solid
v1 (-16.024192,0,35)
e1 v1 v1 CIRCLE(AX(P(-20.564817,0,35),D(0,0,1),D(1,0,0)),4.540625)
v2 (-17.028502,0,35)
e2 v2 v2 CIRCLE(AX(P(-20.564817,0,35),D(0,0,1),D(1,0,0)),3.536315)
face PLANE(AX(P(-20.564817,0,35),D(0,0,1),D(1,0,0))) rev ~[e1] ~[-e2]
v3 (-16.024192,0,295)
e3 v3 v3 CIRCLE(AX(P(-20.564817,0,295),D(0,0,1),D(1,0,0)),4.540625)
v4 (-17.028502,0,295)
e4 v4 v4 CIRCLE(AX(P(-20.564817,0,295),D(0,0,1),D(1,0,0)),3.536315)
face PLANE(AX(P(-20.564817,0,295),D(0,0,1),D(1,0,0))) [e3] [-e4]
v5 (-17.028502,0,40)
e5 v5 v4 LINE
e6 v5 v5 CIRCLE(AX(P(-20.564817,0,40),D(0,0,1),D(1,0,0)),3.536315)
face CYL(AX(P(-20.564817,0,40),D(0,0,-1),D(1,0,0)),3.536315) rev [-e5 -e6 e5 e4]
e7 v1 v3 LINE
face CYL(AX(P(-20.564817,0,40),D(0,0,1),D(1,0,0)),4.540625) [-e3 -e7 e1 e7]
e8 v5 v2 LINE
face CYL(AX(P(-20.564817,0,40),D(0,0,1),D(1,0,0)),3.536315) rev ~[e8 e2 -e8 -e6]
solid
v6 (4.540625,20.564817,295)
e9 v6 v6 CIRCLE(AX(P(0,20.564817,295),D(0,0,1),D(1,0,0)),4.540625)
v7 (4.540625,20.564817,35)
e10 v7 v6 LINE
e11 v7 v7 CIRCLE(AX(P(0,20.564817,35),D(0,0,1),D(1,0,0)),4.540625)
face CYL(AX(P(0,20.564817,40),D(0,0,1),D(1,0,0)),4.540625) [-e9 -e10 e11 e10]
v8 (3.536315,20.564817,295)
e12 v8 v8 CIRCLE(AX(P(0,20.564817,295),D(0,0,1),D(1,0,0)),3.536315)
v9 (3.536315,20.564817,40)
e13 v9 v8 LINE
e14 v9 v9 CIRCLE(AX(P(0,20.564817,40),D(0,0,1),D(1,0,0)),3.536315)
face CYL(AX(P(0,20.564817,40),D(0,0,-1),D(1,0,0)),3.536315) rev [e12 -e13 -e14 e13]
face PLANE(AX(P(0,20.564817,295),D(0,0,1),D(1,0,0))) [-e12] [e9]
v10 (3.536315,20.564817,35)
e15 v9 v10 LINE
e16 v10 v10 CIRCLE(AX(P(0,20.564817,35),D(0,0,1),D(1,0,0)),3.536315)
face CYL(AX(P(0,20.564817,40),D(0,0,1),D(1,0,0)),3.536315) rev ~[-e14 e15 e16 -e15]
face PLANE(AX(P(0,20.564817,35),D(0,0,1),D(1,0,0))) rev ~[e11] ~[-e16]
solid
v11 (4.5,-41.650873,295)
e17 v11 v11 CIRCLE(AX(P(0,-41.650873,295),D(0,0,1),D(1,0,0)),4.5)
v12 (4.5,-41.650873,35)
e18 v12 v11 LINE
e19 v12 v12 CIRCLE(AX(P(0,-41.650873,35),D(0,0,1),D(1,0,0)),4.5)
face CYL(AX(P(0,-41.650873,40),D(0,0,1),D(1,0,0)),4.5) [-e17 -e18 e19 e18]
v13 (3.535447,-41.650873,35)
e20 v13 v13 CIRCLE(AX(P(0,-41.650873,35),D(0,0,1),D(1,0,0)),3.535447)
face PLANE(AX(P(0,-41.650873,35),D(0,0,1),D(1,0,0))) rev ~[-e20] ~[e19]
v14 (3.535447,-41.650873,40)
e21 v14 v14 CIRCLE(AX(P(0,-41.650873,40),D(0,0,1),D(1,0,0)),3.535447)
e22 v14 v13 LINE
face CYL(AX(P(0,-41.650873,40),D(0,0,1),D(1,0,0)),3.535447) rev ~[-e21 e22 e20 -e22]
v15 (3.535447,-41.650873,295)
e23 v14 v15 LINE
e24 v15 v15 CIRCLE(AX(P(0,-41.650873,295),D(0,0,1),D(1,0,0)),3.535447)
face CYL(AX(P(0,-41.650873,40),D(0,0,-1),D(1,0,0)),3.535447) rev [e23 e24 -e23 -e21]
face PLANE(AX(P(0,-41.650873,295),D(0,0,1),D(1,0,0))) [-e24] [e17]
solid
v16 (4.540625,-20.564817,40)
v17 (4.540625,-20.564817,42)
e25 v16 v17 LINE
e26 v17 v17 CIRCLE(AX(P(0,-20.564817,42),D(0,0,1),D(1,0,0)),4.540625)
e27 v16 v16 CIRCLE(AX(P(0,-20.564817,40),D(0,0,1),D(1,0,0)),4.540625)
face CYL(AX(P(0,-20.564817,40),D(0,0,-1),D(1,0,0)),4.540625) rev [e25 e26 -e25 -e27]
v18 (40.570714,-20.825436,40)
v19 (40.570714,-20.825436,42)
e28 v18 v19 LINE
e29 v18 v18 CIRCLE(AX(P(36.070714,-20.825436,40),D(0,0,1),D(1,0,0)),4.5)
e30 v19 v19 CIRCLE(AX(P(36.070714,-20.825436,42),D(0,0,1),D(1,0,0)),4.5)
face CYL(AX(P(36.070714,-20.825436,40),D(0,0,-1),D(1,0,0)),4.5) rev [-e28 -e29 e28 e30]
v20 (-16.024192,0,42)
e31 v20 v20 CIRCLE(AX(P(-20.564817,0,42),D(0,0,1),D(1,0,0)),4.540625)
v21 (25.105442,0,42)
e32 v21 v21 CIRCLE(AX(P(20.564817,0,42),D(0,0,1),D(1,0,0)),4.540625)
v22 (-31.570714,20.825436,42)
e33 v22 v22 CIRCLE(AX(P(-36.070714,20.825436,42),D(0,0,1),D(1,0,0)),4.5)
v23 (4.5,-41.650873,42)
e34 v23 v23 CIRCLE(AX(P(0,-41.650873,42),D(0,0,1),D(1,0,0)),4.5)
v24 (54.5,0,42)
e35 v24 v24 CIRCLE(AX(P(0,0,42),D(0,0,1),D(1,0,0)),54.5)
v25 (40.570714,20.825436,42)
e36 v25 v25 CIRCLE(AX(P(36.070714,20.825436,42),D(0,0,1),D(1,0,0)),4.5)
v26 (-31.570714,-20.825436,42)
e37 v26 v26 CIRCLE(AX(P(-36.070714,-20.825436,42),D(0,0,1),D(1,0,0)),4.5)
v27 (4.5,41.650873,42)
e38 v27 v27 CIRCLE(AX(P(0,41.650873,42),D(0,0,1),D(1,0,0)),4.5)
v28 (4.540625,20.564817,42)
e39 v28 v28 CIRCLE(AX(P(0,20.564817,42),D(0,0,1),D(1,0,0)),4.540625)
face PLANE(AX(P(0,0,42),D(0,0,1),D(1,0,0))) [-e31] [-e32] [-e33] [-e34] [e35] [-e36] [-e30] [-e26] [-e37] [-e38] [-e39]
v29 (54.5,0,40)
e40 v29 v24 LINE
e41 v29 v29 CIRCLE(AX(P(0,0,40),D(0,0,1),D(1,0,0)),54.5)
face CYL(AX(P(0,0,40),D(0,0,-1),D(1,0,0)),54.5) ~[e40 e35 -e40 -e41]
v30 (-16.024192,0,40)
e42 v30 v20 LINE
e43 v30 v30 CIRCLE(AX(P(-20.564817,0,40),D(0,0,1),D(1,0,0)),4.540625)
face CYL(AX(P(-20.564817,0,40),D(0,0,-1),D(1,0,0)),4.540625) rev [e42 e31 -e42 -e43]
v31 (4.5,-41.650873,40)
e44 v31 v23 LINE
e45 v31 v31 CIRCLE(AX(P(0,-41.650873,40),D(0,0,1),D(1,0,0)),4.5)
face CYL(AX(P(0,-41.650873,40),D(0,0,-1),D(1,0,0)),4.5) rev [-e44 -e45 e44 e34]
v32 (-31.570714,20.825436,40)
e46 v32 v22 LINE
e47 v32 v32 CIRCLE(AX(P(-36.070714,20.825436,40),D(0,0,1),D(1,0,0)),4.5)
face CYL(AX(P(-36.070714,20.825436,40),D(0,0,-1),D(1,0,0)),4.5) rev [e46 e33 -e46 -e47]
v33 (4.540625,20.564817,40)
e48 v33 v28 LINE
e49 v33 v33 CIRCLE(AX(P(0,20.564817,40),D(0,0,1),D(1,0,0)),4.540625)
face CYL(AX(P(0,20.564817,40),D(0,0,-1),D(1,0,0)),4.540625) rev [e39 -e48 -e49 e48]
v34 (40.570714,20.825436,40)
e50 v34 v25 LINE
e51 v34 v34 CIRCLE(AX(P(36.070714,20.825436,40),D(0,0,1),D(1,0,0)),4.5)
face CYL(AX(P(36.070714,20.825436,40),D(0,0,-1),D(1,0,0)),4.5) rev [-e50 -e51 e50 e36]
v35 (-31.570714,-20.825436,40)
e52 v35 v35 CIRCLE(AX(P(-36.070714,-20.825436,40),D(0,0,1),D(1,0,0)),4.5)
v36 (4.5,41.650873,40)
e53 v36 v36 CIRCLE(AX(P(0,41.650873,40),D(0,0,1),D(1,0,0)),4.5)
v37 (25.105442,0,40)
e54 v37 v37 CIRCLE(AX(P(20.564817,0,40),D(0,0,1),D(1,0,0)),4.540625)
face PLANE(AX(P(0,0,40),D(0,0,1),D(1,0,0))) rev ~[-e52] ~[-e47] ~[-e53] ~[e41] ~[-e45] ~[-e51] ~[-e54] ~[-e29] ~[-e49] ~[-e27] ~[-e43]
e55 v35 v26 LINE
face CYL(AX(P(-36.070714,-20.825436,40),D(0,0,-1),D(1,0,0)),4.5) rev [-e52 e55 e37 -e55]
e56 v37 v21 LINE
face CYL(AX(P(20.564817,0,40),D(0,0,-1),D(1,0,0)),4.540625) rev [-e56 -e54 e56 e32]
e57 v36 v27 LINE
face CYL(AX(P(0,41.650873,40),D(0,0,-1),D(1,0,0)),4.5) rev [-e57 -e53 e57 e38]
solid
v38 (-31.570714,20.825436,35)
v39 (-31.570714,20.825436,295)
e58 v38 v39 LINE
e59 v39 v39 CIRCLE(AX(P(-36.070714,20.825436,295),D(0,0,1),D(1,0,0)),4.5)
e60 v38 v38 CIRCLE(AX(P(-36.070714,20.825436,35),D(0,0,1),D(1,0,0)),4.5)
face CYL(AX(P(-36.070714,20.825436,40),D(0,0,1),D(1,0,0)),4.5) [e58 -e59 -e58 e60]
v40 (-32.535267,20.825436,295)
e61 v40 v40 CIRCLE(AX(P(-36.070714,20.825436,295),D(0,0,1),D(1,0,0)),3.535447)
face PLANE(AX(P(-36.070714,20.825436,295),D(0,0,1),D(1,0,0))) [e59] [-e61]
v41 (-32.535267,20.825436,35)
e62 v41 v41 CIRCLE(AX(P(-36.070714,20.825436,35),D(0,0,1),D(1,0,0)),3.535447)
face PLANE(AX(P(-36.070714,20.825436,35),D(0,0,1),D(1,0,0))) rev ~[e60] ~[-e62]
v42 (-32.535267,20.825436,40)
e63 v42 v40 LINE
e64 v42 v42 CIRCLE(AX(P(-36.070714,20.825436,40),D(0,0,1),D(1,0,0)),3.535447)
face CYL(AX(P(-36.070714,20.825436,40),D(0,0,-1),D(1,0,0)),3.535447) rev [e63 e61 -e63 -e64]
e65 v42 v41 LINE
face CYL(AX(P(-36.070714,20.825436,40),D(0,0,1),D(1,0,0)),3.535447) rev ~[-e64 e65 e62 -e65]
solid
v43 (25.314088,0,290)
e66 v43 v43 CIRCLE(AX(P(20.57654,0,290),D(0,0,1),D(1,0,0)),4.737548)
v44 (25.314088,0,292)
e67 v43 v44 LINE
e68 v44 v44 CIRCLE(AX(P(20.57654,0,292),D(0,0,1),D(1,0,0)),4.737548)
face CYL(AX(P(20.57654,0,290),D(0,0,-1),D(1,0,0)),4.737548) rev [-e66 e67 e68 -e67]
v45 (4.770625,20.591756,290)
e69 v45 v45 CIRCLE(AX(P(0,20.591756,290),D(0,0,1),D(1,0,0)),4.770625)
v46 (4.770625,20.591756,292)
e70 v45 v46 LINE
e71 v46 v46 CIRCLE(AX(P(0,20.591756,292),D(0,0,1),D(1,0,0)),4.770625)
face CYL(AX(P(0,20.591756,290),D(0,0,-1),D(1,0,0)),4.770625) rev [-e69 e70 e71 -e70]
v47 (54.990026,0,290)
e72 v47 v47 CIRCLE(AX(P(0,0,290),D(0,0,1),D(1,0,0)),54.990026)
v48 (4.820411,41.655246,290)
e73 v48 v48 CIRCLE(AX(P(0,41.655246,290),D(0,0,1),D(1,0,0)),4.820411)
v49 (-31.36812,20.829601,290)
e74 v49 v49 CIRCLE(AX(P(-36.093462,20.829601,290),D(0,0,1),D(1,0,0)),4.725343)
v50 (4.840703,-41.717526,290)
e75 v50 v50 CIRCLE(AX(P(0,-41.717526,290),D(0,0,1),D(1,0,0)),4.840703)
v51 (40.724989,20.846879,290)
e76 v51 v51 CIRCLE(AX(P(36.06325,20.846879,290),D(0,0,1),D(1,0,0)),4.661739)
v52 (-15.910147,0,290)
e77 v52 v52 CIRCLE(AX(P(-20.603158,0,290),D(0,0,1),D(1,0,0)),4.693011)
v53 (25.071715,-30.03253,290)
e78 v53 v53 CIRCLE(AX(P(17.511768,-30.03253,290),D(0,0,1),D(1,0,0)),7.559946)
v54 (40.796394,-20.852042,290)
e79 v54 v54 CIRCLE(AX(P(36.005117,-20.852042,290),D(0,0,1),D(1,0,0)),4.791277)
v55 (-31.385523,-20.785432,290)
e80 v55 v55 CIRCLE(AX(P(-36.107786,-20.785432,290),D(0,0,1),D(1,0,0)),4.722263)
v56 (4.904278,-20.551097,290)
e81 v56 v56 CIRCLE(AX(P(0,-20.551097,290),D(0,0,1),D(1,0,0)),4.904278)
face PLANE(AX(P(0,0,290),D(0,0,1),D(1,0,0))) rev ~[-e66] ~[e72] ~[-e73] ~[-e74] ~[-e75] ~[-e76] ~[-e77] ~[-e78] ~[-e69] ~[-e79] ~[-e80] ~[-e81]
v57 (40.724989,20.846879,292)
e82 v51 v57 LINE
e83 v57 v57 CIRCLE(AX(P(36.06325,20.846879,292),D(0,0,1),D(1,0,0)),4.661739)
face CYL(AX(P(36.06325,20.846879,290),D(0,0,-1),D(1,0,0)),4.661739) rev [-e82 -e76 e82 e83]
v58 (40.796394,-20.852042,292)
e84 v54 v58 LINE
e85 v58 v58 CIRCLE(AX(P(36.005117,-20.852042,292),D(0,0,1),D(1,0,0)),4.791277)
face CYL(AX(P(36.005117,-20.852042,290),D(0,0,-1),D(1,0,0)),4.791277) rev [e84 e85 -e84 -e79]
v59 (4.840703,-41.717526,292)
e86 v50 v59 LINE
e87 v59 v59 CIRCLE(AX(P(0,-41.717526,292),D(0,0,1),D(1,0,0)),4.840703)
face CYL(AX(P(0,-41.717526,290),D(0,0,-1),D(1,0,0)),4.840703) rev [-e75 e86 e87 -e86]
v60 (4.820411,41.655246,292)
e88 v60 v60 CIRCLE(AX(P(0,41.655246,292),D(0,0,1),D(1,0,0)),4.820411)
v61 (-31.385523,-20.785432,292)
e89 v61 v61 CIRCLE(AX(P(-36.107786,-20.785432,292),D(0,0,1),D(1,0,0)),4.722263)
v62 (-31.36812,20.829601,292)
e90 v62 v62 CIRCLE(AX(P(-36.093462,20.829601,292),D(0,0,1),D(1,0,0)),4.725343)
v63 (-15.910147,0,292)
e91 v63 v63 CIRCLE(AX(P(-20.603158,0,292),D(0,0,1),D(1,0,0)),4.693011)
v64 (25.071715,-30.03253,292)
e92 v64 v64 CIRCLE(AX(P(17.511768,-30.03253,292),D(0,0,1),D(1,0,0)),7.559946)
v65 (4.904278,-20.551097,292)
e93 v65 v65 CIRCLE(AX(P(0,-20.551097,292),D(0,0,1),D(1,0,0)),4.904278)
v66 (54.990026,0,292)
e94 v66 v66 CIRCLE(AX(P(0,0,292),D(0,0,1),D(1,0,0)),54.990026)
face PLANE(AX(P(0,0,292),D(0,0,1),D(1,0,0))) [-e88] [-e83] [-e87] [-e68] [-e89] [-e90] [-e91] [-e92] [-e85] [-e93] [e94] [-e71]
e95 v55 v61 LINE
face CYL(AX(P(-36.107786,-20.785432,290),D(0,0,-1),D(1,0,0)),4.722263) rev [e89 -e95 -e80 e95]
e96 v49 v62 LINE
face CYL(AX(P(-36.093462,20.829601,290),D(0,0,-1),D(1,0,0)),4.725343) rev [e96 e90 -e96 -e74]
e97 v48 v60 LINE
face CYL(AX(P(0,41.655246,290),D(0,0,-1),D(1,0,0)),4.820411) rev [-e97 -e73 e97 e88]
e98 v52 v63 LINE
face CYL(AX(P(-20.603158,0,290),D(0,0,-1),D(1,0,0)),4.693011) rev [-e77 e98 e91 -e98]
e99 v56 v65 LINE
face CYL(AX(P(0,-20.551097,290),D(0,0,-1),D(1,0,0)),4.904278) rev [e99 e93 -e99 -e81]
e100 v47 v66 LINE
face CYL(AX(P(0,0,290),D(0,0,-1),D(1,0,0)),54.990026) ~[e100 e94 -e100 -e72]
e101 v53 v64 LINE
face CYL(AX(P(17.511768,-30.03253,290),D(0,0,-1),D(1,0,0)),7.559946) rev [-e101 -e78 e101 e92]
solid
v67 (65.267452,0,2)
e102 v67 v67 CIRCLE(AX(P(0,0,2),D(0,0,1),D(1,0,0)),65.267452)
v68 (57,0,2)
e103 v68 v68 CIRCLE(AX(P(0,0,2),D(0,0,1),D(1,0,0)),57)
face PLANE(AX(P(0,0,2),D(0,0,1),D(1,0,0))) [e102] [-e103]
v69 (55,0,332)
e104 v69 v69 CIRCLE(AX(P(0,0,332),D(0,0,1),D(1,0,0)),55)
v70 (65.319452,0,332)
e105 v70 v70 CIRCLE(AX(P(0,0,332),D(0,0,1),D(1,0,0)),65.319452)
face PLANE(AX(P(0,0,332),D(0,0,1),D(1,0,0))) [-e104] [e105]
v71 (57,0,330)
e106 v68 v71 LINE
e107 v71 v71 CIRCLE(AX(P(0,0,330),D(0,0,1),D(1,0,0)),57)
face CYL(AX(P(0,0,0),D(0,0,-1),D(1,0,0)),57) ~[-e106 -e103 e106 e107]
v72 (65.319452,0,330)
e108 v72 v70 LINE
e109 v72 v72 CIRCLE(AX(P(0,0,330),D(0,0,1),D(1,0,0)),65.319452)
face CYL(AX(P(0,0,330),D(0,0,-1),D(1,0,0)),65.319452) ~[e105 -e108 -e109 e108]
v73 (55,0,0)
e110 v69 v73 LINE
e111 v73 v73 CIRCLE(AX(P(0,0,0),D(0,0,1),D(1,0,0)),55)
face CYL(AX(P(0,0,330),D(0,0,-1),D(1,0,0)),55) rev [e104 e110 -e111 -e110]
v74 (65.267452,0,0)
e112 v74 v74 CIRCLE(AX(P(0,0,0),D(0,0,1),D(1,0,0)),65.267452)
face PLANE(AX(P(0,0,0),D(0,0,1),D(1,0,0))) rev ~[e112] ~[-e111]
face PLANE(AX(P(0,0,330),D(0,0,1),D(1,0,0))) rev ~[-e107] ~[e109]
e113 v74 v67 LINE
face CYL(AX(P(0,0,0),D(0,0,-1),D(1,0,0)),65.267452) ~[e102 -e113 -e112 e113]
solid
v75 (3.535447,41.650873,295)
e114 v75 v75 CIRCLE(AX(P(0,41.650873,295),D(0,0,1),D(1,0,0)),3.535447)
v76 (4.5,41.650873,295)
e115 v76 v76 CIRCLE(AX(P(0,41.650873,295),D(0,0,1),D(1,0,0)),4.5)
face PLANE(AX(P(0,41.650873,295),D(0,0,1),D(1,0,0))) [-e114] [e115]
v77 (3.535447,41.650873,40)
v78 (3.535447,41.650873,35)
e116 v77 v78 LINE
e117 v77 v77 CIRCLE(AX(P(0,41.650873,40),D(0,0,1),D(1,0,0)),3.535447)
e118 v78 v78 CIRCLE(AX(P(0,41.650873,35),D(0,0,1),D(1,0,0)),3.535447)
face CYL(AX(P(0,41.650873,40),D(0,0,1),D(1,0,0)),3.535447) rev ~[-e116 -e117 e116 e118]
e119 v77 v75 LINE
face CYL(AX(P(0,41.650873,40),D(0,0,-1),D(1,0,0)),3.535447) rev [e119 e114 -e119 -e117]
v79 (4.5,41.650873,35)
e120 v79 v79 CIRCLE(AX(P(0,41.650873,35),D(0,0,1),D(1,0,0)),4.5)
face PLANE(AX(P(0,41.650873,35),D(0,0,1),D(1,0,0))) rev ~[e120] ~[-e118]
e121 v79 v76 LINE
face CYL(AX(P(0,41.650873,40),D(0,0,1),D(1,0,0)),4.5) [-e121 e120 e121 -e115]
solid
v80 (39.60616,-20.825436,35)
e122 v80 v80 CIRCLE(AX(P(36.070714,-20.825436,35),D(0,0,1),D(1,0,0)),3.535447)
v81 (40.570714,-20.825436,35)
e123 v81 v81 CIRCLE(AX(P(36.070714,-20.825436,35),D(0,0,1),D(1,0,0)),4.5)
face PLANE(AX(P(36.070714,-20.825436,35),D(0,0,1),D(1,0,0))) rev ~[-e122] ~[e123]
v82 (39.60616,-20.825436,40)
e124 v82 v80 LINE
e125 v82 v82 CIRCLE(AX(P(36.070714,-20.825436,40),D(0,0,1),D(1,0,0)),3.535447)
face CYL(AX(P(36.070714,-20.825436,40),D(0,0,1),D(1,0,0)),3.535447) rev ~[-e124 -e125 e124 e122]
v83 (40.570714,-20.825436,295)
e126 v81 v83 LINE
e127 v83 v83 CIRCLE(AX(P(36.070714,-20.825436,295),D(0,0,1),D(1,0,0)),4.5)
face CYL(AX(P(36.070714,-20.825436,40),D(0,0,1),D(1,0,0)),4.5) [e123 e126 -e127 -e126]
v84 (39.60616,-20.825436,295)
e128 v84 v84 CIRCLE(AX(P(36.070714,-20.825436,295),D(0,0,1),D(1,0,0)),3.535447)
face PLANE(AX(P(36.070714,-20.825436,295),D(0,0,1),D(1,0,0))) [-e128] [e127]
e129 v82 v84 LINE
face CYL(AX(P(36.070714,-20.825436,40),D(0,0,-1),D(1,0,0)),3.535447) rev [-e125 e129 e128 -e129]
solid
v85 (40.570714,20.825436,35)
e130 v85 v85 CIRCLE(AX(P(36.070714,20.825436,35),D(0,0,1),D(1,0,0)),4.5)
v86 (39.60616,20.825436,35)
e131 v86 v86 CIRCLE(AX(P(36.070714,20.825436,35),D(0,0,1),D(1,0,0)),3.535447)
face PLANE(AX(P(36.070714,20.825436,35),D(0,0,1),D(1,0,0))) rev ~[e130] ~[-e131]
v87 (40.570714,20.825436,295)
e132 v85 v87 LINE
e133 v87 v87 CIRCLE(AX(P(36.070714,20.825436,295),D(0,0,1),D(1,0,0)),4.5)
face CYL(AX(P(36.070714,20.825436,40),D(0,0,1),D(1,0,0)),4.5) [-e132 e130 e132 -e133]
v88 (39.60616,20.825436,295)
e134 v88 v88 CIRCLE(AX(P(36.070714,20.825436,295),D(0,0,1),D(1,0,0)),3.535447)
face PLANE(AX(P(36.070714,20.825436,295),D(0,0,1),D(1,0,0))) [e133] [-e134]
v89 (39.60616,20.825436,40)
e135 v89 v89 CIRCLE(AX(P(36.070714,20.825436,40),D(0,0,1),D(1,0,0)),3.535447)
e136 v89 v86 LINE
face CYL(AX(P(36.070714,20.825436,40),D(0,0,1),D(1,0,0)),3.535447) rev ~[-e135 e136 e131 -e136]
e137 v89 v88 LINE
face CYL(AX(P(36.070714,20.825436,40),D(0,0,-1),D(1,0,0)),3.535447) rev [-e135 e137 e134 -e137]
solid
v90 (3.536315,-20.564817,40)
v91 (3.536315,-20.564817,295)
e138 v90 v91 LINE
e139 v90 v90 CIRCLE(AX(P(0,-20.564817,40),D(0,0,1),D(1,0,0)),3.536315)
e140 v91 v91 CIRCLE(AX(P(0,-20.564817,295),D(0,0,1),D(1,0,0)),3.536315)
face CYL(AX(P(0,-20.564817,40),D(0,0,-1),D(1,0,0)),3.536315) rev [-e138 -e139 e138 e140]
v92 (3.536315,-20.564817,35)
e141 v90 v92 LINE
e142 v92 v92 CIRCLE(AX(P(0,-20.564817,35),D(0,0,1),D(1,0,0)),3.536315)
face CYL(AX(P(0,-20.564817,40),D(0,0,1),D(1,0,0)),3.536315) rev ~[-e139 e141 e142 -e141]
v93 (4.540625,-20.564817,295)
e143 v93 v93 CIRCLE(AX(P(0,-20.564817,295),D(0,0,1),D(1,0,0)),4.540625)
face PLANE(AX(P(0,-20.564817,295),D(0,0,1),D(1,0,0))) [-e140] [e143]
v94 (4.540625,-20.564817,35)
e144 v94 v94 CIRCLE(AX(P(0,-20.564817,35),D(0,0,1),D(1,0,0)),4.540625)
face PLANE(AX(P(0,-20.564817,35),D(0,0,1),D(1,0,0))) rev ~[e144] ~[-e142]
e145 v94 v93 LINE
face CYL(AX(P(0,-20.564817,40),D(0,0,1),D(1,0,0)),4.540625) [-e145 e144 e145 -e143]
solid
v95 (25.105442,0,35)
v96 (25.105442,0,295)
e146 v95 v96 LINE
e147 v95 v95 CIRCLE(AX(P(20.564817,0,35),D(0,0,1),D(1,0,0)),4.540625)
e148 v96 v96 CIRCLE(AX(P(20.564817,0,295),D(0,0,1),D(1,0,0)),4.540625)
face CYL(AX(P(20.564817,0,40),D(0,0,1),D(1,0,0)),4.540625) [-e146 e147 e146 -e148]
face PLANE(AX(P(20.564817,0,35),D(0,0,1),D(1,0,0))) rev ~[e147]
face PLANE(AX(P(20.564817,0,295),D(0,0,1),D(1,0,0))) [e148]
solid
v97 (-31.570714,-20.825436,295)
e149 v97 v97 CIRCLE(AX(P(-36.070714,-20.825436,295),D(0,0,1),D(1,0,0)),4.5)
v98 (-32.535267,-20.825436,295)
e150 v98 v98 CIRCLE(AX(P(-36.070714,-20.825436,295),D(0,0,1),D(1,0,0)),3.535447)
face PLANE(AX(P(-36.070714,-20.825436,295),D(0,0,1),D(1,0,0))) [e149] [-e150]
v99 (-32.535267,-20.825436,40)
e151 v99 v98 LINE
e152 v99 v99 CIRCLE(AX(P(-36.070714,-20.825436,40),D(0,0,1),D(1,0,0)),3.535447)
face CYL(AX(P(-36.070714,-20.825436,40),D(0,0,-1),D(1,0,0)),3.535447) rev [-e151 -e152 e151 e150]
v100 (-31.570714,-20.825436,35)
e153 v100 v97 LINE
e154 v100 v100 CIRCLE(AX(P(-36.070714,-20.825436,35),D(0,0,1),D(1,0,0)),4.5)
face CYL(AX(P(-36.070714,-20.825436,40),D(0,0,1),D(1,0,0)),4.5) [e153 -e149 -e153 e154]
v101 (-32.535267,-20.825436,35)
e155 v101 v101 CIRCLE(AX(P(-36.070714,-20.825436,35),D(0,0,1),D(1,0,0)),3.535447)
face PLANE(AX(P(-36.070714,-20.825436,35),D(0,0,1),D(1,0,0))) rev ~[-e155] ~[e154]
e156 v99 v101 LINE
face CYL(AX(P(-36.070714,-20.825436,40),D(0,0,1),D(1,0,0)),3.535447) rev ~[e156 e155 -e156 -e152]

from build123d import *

# Parameters (mm, degrees)
F0_R           = 57
F0_R_2         = 55
F1_DEPTH       = 330
F3_R           = 54.5
F3_R_2         = 4.5
F3_R_3         = 4.5406250868
F4_DEPTH       = 2
F7_R           = 54.9900255747
F7_R_2         = 4.722262568
F7_R_3         = 4.8407025495
F7_R_4         = 7.5599462379
F7_R_5         = 4.9042775529
F7_R_6         = 4.7912767067
F7_R_7         = 4.7253426237
F7_R_8         = 4.6930109119
F7_R_9         = 4.737547838
F7_R_10        = 4.7706252864
F7_R_11        = 4.6617392288
F7_R_12        = 4.8204107034
F8_DEPTH       = 2
F9_R           = 65.3194518725
F9_R_2         = 57
F9_R_3         = 55
F10_DEPTH      = 2
F0_R_3         = 65.267452465
F11_DEPTH      = 2
F3_R_4         = 3.5354466149
F12_DEPTH      = 255
F12_DEPTH_BACK = 5
F3_R_5         = 3.5363153387


# Not quite as in the source:
# - a feature of the source that left no trace in its solid (it failed there, or was rolled back) is left out


with BuildPart() as f1:
    # F0 (on Top) → F1 (new body)
    with BuildSketch(Plane.XY):
        Circle(F0_R)
        Circle(F0_R_2, mode=Mode.SUBTRACT)
    extrude(amount=F1_DEPTH)

    # F9 (on face) → F10 (join)
    with BuildSketch(Plane.XY.offset(330)):
        Circle(F9_R)
        Circle(F9_R_2, mode=Mode.SUBTRACT)
        Circle(F9_R_2)
        Circle(F9_R_3, mode=Mode.SUBTRACT)
    extrude(amount=F10_DEPTH)

    # F0 (on Top) → F11 (join)
    with BuildSketch(Plane.XY):
        Circle(F0_R_3)
        Circle(F0_R, mode=Mode.SUBTRACT)
    extrude(amount=F11_DEPTH)


with BuildPart() as f4:
    # F3 (on offset) → F4 (new body)
    with BuildSketch(Plane.XY.offset(40)):
        Circle(F3_R)
        with Locations((-36.0707138286, -20.8254363388)):
            Circle(F3_R_2, mode=Mode.SUBTRACT)
        with Locations((0, -41.6508726776)):
            Circle(F3_R_2, mode=Mode.SUBTRACT)
        with Locations((0, -20.5648168921)):
            Circle(F3_R_3, mode=Mode.SUBTRACT)
        with Locations((36.0707138286, -20.8254363388)):
            Circle(F3_R_2, mode=Mode.SUBTRACT)
        with Locations((-36.0707138286, 20.8254363388)):
            Circle(F3_R_2, mode=Mode.SUBTRACT)
        with Locations((-20.5648168921, 0)):
            Circle(F3_R_3, mode=Mode.SUBTRACT)
        with Locations((20.5648168921, 0)):
            Circle(F3_R_3, mode=Mode.SUBTRACT)
        with Locations((0, 20.5648168921)):
            Circle(F3_R_3, mode=Mode.SUBTRACT)
        with Locations((36.0707138286, 20.8254363388)):
            Circle(F3_R_2, mode=Mode.SUBTRACT)
        with Locations((0, 41.6508726776)):
            Circle(F3_R_2, mode=Mode.SUBTRACT)
    extrude(amount=F4_DEPTH)


with BuildPart() as f8:
    # F7 (on offset) → F8 (new body)
    with BuildSketch(Plane.XY.offset(290)):
        Circle(F7_R)
        with Locations((-36.1077859998, -20.7854323089)):
            Circle(F7_R_2, mode=Mode.SUBTRACT)
        with Locations((0, -41.7175255716)):
            Circle(F7_R_3, mode=Mode.SUBTRACT)
        with Locations((17.5117682666, -30.032530427)):
            Circle(F7_R_4, mode=Mode.SUBTRACT)
        with Locations((0, -20.551096648)):
            Circle(F7_R_5, mode=Mode.SUBTRACT)
        with Locations((36.0051169991, -20.8520423621)):
            Circle(F7_R_6, mode=Mode.SUBTRACT)
        with Locations((-36.0934622586, 20.8296012133)):
            Circle(F7_R_7, mode=Mode.SUBTRACT)
        with Locations((-20.6031575799, 0)):
            Circle(F7_R_8, mode=Mode.SUBTRACT)
        with Locations((20.5765403807, 0)):
            Circle(F7_R_9, mode=Mode.SUBTRACT)
        with Locations((0, 20.5917563289)):
            Circle(F7_R_10, mode=Mode.SUBTRACT)
        with Locations((36.0632501543, 20.8468791097)):
            Circle(F7_R_11, mode=Mode.SUBTRACT)
        with Locations((0, 41.6552461684)):
            Circle(F7_R_12, mode=Mode.SUBTRACT)
    extrude(amount=F8_DEPTH)


with BuildPart() as f12:
    # F3 (on offset) → F12 (new body, two sides)
    with BuildSketch(Plane.XY.offset(40)) as f12_sk:
        with Locations((-36.0707138286, -20.8254363388)):
            Circle(F3_R_2)
        with Locations((-36.0707138286, -20.8254363388)):
            Circle(F3_R_4, mode=Mode.SUBTRACT)
    extrude(amount=F12_DEPTH)
    extrude(f12_sk.sketch, amount=-F12_DEPTH_BACK)


with BuildPart() as f12b:
    # F3 (on offset) → F12, piece 2 (new body, two sides)
    with BuildSketch(Plane.XY.offset(40)) as f12_2_sk:
        with Locations((-20.5648168921, 0)):
            Circle(F3_R_3)
        with Locations((-20.5648168921, 0)):
            Circle(F3_R_5, mode=Mode.SUBTRACT)
    extrude(amount=F12_DEPTH)
    extrude(f12_2_sk.sketch, amount=-F12_DEPTH_BACK)


with BuildPart() as f12c:
    # F3 (on offset) → F12, piece 3 (new body, two sides)
    with BuildSketch(Plane.XY.offset(40)) as f12_3_sk:
        with Locations((0, -41.6508726776)):
            Circle(F3_R_2)
        with Locations((0, -41.6508726776)):
            Circle(F3_R_4, mode=Mode.SUBTRACT)
    extrude(amount=F12_DEPTH)
    extrude(f12_3_sk.sketch, amount=-F12_DEPTH_BACK)


with BuildPart() as f12d:
    # F3 (on offset) → F12, piece 4 (new body, two sides)
    with BuildSketch(Plane.XY.offset(40)) as f12_4_sk:
        with Locations((36.0707138286, -20.8254363388)):
            Circle(F3_R_2)
        with Locations((36.0707138286, -20.8254363388)):
            Circle(F3_R_4, mode=Mode.SUBTRACT)
    extrude(amount=F12_DEPTH)
    extrude(f12_4_sk.sketch, amount=-F12_DEPTH_BACK)


with BuildPart() as f12e:
    # F3 (on offset) → F12, piece 5 (new body, two sides)
    with BuildSketch(Plane.XY.offset(40)) as f12_5_sk:
        with Locations((0, -20.5648168921)):
            Circle(F3_R_3)
        with Locations((0, -20.5648168921)):
            Circle(F3_R_5, mode=Mode.SUBTRACT)
    extrude(amount=F12_DEPTH)
    extrude(f12_5_sk.sketch, amount=-F12_DEPTH_BACK)


with BuildPart() as f12f:
    # F3 (on offset) → F12, piece 6 (new body, two sides)
    with BuildSketch(Plane.XY.offset(40)) as f12_6_sk:
        with Locations((36.0707138286, 20.8254363388)):
            Circle(F3_R_2)
        with Locations((36.0707138286, 20.8254363388)):
            Circle(F3_R_4, mode=Mode.SUBTRACT)
    extrude(amount=F12_DEPTH)
    extrude(f12_6_sk.sketch, amount=-F12_DEPTH_BACK)


with BuildPart() as f12g:
    # F3 (on offset) → F12, piece 7 (new body, two sides)
    with BuildSketch(Plane.XY.offset(40)) as f12_7_sk:
        with Locations((0, 41.6508726776)):
            Circle(F3_R_2)
        with Locations((0, 41.6508726776)):
            Circle(F3_R_4, mode=Mode.SUBTRACT)
    extrude(amount=F12_DEPTH)
    extrude(f12_7_sk.sketch, amount=-F12_DEPTH_BACK)


with BuildPart() as f12h:
    # F3 (on offset) → F12, piece 8 (new body, two sides)
    with BuildSketch(Plane.XY.offset(40)) as f12_8_sk:
        with Locations((0, 20.5648168921)):
            Circle(F3_R_3)
        with Locations((0, 20.5648168921)):
            Circle(F3_R_5, mode=Mode.SUBTRACT)
    extrude(amount=F12_DEPTH)
    extrude(f12_8_sk.sketch, amount=-F12_DEPTH_BACK)


with BuildPart() as f12i:
    # F3 (on offset) → F12, piece 9 (new body, two sides)
    with BuildSketch(Plane.XY.offset(40)) as f12_9_sk:
        with Locations((-36.0707138286, 20.8254363388)):
            Circle(F3_R_2)
        with Locations((-36.0707138286, 20.8254363388)):
            Circle(F3_R_4, mode=Mode.SUBTRACT)
    extrude(amount=F12_DEPTH)
    extrude(f12_9_sk.sketch, amount=-F12_DEPTH_BACK)


with BuildPart() as f12j:
    # F3 (on offset) → F12, piece 10 (new body, two sides)
    with BuildSketch(Plane.XY.offset(40)) as f12_10_sk:
        with Locations((20.5648168921, 0)):
            Circle(F3_R_3)
        with Locations((20.5648168921, 0)):
            Circle(F3_R_5, mode=Mode.SUBTRACT)
        with Locations((20.5648168921, 0)):
            Circle(F3_R_5)
    extrude(amount=F12_DEPTH)
    extrude(f12_10_sk.sketch, amount=-F12_DEPTH_BACK)


solid = Compound([f1.part, f4.part, f8.part, f12.part, f12b.part, f12c.part, f12d.part, f12e.part, f12f.part, f12g.part, f12h.part, f12i.part, f12j.part])
